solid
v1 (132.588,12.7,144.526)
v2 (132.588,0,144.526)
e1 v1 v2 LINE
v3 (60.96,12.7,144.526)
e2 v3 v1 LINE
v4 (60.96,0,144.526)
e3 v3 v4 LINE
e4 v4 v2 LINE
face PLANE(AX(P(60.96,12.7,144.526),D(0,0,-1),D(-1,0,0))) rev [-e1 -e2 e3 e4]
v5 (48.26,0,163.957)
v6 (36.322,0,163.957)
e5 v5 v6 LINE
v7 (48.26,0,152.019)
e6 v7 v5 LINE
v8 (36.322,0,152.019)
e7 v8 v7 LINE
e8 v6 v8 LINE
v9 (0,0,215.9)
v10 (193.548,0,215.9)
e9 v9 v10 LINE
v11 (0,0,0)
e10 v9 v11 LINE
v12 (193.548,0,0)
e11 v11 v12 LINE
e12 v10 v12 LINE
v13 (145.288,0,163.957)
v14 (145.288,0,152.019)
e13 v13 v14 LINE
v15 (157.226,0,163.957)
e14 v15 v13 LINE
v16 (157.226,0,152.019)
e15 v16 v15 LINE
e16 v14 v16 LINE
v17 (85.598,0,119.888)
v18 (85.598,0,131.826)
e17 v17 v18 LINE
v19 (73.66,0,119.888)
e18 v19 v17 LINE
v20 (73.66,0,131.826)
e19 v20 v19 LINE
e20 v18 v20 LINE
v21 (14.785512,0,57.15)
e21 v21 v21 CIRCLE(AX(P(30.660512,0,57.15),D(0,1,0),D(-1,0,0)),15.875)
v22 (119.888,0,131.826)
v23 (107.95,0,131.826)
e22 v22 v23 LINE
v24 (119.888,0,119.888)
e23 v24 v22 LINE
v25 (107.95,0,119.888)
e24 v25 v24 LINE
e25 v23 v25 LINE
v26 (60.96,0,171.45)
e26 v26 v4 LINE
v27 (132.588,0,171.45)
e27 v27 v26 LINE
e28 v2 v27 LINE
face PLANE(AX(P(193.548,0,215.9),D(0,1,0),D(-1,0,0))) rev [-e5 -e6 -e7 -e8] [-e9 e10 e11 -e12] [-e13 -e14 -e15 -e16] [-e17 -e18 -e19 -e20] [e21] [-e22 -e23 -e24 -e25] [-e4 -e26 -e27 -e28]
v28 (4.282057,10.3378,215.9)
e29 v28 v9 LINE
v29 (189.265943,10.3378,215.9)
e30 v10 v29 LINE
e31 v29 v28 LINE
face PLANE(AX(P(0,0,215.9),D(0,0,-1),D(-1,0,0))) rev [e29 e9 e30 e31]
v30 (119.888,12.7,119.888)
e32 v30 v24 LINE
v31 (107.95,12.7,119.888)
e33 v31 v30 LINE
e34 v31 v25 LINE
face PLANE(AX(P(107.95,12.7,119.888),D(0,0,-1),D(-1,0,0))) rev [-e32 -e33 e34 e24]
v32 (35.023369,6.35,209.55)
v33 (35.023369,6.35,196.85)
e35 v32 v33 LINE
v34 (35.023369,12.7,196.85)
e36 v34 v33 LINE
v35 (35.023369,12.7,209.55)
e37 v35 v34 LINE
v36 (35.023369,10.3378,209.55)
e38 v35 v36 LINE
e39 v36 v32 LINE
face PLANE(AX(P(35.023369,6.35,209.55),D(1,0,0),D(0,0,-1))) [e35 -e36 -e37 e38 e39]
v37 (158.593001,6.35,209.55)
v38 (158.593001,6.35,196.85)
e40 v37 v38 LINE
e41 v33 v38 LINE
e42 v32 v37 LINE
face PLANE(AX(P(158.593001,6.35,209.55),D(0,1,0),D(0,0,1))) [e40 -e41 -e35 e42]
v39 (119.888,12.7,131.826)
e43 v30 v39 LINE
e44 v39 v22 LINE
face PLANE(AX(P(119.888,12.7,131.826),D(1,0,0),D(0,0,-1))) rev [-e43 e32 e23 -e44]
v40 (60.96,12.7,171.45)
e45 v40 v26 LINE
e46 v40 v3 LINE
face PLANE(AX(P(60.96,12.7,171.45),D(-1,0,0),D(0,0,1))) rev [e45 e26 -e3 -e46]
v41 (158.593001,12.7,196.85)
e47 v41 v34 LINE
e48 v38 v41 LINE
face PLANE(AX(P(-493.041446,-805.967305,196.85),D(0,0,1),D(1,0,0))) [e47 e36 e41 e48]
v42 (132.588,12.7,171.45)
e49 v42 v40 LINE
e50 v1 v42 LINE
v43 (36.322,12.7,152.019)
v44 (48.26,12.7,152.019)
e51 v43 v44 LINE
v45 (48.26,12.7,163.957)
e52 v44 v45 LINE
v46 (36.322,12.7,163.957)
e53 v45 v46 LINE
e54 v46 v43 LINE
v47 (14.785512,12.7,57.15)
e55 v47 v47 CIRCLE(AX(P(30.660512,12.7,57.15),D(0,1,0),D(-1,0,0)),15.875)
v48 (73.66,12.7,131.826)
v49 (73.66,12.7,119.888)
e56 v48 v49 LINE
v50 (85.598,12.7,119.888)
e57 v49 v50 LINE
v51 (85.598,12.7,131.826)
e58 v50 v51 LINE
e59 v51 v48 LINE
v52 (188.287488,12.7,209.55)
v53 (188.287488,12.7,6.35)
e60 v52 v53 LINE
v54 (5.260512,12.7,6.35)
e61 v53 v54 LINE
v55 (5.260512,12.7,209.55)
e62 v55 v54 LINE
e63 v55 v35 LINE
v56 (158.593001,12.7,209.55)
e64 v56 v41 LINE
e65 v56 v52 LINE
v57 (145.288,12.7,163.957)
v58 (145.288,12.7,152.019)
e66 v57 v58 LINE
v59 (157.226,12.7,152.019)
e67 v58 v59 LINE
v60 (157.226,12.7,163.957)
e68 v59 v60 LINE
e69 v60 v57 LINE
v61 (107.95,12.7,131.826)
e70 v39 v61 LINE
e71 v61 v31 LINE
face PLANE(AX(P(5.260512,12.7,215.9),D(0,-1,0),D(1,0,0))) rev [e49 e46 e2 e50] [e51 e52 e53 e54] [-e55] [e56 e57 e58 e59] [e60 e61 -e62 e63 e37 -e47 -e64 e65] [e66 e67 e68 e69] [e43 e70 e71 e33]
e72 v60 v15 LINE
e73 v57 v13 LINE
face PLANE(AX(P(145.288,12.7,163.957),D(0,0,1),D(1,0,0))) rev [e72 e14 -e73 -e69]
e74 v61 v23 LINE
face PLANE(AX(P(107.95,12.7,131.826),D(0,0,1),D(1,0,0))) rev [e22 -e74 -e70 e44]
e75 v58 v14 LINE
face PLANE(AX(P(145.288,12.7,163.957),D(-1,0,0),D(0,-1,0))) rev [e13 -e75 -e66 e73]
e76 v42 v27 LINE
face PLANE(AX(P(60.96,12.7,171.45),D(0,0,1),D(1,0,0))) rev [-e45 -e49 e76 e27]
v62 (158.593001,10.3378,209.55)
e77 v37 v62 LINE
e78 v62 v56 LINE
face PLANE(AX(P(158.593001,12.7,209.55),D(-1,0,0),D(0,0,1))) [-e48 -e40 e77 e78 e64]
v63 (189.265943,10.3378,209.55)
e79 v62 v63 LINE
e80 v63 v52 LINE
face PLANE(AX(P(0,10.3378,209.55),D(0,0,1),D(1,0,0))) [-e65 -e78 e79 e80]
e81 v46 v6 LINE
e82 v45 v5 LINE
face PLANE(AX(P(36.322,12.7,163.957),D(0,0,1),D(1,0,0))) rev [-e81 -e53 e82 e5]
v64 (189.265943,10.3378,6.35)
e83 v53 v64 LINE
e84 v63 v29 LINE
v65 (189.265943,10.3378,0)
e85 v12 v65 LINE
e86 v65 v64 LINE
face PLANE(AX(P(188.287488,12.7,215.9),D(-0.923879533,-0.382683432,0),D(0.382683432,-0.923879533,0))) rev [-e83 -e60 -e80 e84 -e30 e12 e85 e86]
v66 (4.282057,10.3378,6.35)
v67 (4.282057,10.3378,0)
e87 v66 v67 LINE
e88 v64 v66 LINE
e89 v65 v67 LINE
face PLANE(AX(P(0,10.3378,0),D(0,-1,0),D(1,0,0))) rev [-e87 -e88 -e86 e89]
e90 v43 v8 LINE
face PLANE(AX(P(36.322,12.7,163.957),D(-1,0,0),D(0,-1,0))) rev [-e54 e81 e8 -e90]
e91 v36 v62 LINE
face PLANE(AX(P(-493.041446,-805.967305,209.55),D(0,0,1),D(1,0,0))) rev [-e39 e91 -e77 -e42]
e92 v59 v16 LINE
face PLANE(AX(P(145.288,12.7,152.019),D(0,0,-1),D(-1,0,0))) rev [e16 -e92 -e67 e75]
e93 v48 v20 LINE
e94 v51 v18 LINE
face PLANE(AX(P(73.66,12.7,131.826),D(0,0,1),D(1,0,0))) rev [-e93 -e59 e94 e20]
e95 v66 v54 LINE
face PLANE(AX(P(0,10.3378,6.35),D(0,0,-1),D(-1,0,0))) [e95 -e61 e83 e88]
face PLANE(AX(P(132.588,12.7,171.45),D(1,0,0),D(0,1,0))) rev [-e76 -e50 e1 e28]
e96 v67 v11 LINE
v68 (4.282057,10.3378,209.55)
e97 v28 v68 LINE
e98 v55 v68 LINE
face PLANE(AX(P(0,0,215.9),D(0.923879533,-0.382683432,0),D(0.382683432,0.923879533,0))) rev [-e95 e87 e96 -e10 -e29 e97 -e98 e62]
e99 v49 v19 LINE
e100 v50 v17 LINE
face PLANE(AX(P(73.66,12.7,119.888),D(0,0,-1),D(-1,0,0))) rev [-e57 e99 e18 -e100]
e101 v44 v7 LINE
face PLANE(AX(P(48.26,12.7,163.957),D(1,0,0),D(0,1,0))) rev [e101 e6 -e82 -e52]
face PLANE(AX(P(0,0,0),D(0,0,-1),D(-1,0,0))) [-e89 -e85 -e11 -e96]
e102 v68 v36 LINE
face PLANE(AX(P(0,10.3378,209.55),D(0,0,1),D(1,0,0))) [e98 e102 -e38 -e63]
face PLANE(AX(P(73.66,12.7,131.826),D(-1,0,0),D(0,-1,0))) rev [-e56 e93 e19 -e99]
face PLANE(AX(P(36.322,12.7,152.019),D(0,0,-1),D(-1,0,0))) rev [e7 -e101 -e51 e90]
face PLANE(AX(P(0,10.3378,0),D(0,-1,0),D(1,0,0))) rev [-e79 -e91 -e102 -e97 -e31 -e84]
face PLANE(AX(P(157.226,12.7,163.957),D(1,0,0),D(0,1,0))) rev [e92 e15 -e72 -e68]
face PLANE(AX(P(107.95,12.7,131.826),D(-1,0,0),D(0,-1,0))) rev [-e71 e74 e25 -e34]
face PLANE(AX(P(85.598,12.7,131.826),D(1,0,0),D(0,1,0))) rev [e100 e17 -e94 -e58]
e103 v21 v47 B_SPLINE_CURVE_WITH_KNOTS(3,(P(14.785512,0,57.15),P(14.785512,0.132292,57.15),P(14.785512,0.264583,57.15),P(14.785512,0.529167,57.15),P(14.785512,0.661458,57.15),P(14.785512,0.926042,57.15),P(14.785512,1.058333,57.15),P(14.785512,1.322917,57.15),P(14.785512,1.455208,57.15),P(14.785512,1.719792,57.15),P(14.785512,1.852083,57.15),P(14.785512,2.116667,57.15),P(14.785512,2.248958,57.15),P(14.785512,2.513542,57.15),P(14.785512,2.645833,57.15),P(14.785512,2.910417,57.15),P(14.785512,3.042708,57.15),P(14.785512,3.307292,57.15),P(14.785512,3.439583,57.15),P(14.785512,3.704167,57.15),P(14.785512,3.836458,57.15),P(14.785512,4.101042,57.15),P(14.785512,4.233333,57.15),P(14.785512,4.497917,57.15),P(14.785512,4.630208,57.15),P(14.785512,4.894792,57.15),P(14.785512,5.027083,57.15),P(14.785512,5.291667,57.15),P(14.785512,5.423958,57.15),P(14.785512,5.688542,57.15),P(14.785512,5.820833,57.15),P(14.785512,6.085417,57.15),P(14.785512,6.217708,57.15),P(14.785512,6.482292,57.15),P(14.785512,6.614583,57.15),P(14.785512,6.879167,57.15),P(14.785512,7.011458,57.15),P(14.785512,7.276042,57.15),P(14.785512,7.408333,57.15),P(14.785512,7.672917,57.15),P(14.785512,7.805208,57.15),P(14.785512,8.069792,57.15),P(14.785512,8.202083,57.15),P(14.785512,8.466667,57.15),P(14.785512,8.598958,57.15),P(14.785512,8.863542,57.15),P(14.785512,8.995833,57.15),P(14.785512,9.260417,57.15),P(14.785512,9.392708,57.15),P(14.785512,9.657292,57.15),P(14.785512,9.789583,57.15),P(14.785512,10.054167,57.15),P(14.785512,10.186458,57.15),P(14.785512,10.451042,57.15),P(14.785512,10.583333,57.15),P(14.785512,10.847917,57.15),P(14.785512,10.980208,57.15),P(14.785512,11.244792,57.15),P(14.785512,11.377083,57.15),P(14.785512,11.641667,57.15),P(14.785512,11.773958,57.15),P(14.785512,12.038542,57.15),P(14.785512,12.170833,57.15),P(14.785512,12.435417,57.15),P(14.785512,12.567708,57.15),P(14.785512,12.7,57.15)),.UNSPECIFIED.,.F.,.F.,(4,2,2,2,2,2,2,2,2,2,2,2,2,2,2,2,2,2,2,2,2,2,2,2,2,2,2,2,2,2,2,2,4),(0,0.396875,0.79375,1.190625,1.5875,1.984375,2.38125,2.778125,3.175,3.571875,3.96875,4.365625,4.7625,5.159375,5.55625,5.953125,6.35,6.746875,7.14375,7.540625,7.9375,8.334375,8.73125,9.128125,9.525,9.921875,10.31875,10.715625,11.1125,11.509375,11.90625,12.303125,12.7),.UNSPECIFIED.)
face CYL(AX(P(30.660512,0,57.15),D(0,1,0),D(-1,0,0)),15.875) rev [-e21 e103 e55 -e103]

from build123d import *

# Parameters (mm, degrees)
BOSS_EXTRUDE1_DEPTH = 215.9
SKETCH2_W           = 193.548
SKETCH2_H           = 6.35
CUT_EXTRUDE1_DEPTH  = 2.3622
SKETCH3_W           = 71.628
SKETCH3_H           = 26.924
SKETCH3_W_2         = 11.938
SKETCH3_H_2         = 11.938
CUT_EXTRUDE3_DEPTH  = 291.232541773
SKETCH4_R           = 15.875
CUT_EXTRUDE4_DEPTH  = 291.232541773
CAVITY1_START       = 196.85
CAVITY1_OUTLINE_W   = 123.569632405
CAVITY1_OUTLINE_H   = 6.35
CAVITY1_DEPTH       = 12.7


# Read off the part's stored shape, not the designer's step: Cavity1
with BuildPart() as part:
    # Sketch1 → Boss-Extrude1 (new body)
    with BuildSketch(Plane.XY):
        Polygon((0, 0), (5.260512242, 12.7), (188.287487758, 12.7), (193.548, 0), align=None)
    extrude(amount=BOSS_EXTRUDE1_DEPTH)

    # Sketch2 → Cut-Extrude1 (cut)
    with BuildSketch(Plane.XZ.offset(-12.7)):
        with Locations((96.774, 3.175)):
            Rectangle(SKETCH2_W, SKETCH2_H)
        with Locations((96.774, 212.725)):
            Rectangle(SKETCH2_W, SKETCH2_H)
    extrude(amount=CUT_EXTRUDE1_DEPTH, mode=Mode.SUBTRACT)

    # Sketch3 → Cut-Extrude3 (cut, through all)
    with BuildSketch(Plane.XZ):
        with Locations((96.774, 157.988)):
            Rectangle(SKETCH3_W, SKETCH3_H)
        with Locations((79.629, 125.857)):
            Rectangle(SKETCH3_W_2, SKETCH3_H_2)
        with Locations((113.919, 125.857)):
            Rectangle(SKETCH3_W_2, SKETCH3_H_2)
        with Locations((151.257, 157.988)):
            Rectangle(SKETCH3_W_2, SKETCH3_H_2)
        with Locations((42.291, 157.988)):
            Rectangle(SKETCH3_W_2, SKETCH3_H_2)
    extrude(amount=-CUT_EXTRUDE3_DEPTH, mode=Mode.SUBTRACT)

    # Sketch4 → Cut-Extrude4 (cut, through all)
    with BuildSketch(Plane(origin=(0, 12.7, 0), x_dir=(1, 0, 0), z_dir=(0, 1, 0))):
        with Locations(Location((30.660512242, -57.15, 0), (0, 0, 180))):
            Circle(SKETCH4_R)
    extrude(amount=-CUT_EXTRUDE4_DEPTH, mode=Mode.SUBTRACT)

    # Cavity1 outline → Cavity1 (cut)
    with BuildSketch(Plane.XY.offset(CAVITY1_START)):
        with Locations((96.808185153, 9.525)):
            Rectangle(CAVITY1_OUTLINE_W, CAVITY1_OUTLINE_H)
    extrude(amount=CAVITY1_DEPTH, mode=Mode.SUBTRACT)


solid = part.part
